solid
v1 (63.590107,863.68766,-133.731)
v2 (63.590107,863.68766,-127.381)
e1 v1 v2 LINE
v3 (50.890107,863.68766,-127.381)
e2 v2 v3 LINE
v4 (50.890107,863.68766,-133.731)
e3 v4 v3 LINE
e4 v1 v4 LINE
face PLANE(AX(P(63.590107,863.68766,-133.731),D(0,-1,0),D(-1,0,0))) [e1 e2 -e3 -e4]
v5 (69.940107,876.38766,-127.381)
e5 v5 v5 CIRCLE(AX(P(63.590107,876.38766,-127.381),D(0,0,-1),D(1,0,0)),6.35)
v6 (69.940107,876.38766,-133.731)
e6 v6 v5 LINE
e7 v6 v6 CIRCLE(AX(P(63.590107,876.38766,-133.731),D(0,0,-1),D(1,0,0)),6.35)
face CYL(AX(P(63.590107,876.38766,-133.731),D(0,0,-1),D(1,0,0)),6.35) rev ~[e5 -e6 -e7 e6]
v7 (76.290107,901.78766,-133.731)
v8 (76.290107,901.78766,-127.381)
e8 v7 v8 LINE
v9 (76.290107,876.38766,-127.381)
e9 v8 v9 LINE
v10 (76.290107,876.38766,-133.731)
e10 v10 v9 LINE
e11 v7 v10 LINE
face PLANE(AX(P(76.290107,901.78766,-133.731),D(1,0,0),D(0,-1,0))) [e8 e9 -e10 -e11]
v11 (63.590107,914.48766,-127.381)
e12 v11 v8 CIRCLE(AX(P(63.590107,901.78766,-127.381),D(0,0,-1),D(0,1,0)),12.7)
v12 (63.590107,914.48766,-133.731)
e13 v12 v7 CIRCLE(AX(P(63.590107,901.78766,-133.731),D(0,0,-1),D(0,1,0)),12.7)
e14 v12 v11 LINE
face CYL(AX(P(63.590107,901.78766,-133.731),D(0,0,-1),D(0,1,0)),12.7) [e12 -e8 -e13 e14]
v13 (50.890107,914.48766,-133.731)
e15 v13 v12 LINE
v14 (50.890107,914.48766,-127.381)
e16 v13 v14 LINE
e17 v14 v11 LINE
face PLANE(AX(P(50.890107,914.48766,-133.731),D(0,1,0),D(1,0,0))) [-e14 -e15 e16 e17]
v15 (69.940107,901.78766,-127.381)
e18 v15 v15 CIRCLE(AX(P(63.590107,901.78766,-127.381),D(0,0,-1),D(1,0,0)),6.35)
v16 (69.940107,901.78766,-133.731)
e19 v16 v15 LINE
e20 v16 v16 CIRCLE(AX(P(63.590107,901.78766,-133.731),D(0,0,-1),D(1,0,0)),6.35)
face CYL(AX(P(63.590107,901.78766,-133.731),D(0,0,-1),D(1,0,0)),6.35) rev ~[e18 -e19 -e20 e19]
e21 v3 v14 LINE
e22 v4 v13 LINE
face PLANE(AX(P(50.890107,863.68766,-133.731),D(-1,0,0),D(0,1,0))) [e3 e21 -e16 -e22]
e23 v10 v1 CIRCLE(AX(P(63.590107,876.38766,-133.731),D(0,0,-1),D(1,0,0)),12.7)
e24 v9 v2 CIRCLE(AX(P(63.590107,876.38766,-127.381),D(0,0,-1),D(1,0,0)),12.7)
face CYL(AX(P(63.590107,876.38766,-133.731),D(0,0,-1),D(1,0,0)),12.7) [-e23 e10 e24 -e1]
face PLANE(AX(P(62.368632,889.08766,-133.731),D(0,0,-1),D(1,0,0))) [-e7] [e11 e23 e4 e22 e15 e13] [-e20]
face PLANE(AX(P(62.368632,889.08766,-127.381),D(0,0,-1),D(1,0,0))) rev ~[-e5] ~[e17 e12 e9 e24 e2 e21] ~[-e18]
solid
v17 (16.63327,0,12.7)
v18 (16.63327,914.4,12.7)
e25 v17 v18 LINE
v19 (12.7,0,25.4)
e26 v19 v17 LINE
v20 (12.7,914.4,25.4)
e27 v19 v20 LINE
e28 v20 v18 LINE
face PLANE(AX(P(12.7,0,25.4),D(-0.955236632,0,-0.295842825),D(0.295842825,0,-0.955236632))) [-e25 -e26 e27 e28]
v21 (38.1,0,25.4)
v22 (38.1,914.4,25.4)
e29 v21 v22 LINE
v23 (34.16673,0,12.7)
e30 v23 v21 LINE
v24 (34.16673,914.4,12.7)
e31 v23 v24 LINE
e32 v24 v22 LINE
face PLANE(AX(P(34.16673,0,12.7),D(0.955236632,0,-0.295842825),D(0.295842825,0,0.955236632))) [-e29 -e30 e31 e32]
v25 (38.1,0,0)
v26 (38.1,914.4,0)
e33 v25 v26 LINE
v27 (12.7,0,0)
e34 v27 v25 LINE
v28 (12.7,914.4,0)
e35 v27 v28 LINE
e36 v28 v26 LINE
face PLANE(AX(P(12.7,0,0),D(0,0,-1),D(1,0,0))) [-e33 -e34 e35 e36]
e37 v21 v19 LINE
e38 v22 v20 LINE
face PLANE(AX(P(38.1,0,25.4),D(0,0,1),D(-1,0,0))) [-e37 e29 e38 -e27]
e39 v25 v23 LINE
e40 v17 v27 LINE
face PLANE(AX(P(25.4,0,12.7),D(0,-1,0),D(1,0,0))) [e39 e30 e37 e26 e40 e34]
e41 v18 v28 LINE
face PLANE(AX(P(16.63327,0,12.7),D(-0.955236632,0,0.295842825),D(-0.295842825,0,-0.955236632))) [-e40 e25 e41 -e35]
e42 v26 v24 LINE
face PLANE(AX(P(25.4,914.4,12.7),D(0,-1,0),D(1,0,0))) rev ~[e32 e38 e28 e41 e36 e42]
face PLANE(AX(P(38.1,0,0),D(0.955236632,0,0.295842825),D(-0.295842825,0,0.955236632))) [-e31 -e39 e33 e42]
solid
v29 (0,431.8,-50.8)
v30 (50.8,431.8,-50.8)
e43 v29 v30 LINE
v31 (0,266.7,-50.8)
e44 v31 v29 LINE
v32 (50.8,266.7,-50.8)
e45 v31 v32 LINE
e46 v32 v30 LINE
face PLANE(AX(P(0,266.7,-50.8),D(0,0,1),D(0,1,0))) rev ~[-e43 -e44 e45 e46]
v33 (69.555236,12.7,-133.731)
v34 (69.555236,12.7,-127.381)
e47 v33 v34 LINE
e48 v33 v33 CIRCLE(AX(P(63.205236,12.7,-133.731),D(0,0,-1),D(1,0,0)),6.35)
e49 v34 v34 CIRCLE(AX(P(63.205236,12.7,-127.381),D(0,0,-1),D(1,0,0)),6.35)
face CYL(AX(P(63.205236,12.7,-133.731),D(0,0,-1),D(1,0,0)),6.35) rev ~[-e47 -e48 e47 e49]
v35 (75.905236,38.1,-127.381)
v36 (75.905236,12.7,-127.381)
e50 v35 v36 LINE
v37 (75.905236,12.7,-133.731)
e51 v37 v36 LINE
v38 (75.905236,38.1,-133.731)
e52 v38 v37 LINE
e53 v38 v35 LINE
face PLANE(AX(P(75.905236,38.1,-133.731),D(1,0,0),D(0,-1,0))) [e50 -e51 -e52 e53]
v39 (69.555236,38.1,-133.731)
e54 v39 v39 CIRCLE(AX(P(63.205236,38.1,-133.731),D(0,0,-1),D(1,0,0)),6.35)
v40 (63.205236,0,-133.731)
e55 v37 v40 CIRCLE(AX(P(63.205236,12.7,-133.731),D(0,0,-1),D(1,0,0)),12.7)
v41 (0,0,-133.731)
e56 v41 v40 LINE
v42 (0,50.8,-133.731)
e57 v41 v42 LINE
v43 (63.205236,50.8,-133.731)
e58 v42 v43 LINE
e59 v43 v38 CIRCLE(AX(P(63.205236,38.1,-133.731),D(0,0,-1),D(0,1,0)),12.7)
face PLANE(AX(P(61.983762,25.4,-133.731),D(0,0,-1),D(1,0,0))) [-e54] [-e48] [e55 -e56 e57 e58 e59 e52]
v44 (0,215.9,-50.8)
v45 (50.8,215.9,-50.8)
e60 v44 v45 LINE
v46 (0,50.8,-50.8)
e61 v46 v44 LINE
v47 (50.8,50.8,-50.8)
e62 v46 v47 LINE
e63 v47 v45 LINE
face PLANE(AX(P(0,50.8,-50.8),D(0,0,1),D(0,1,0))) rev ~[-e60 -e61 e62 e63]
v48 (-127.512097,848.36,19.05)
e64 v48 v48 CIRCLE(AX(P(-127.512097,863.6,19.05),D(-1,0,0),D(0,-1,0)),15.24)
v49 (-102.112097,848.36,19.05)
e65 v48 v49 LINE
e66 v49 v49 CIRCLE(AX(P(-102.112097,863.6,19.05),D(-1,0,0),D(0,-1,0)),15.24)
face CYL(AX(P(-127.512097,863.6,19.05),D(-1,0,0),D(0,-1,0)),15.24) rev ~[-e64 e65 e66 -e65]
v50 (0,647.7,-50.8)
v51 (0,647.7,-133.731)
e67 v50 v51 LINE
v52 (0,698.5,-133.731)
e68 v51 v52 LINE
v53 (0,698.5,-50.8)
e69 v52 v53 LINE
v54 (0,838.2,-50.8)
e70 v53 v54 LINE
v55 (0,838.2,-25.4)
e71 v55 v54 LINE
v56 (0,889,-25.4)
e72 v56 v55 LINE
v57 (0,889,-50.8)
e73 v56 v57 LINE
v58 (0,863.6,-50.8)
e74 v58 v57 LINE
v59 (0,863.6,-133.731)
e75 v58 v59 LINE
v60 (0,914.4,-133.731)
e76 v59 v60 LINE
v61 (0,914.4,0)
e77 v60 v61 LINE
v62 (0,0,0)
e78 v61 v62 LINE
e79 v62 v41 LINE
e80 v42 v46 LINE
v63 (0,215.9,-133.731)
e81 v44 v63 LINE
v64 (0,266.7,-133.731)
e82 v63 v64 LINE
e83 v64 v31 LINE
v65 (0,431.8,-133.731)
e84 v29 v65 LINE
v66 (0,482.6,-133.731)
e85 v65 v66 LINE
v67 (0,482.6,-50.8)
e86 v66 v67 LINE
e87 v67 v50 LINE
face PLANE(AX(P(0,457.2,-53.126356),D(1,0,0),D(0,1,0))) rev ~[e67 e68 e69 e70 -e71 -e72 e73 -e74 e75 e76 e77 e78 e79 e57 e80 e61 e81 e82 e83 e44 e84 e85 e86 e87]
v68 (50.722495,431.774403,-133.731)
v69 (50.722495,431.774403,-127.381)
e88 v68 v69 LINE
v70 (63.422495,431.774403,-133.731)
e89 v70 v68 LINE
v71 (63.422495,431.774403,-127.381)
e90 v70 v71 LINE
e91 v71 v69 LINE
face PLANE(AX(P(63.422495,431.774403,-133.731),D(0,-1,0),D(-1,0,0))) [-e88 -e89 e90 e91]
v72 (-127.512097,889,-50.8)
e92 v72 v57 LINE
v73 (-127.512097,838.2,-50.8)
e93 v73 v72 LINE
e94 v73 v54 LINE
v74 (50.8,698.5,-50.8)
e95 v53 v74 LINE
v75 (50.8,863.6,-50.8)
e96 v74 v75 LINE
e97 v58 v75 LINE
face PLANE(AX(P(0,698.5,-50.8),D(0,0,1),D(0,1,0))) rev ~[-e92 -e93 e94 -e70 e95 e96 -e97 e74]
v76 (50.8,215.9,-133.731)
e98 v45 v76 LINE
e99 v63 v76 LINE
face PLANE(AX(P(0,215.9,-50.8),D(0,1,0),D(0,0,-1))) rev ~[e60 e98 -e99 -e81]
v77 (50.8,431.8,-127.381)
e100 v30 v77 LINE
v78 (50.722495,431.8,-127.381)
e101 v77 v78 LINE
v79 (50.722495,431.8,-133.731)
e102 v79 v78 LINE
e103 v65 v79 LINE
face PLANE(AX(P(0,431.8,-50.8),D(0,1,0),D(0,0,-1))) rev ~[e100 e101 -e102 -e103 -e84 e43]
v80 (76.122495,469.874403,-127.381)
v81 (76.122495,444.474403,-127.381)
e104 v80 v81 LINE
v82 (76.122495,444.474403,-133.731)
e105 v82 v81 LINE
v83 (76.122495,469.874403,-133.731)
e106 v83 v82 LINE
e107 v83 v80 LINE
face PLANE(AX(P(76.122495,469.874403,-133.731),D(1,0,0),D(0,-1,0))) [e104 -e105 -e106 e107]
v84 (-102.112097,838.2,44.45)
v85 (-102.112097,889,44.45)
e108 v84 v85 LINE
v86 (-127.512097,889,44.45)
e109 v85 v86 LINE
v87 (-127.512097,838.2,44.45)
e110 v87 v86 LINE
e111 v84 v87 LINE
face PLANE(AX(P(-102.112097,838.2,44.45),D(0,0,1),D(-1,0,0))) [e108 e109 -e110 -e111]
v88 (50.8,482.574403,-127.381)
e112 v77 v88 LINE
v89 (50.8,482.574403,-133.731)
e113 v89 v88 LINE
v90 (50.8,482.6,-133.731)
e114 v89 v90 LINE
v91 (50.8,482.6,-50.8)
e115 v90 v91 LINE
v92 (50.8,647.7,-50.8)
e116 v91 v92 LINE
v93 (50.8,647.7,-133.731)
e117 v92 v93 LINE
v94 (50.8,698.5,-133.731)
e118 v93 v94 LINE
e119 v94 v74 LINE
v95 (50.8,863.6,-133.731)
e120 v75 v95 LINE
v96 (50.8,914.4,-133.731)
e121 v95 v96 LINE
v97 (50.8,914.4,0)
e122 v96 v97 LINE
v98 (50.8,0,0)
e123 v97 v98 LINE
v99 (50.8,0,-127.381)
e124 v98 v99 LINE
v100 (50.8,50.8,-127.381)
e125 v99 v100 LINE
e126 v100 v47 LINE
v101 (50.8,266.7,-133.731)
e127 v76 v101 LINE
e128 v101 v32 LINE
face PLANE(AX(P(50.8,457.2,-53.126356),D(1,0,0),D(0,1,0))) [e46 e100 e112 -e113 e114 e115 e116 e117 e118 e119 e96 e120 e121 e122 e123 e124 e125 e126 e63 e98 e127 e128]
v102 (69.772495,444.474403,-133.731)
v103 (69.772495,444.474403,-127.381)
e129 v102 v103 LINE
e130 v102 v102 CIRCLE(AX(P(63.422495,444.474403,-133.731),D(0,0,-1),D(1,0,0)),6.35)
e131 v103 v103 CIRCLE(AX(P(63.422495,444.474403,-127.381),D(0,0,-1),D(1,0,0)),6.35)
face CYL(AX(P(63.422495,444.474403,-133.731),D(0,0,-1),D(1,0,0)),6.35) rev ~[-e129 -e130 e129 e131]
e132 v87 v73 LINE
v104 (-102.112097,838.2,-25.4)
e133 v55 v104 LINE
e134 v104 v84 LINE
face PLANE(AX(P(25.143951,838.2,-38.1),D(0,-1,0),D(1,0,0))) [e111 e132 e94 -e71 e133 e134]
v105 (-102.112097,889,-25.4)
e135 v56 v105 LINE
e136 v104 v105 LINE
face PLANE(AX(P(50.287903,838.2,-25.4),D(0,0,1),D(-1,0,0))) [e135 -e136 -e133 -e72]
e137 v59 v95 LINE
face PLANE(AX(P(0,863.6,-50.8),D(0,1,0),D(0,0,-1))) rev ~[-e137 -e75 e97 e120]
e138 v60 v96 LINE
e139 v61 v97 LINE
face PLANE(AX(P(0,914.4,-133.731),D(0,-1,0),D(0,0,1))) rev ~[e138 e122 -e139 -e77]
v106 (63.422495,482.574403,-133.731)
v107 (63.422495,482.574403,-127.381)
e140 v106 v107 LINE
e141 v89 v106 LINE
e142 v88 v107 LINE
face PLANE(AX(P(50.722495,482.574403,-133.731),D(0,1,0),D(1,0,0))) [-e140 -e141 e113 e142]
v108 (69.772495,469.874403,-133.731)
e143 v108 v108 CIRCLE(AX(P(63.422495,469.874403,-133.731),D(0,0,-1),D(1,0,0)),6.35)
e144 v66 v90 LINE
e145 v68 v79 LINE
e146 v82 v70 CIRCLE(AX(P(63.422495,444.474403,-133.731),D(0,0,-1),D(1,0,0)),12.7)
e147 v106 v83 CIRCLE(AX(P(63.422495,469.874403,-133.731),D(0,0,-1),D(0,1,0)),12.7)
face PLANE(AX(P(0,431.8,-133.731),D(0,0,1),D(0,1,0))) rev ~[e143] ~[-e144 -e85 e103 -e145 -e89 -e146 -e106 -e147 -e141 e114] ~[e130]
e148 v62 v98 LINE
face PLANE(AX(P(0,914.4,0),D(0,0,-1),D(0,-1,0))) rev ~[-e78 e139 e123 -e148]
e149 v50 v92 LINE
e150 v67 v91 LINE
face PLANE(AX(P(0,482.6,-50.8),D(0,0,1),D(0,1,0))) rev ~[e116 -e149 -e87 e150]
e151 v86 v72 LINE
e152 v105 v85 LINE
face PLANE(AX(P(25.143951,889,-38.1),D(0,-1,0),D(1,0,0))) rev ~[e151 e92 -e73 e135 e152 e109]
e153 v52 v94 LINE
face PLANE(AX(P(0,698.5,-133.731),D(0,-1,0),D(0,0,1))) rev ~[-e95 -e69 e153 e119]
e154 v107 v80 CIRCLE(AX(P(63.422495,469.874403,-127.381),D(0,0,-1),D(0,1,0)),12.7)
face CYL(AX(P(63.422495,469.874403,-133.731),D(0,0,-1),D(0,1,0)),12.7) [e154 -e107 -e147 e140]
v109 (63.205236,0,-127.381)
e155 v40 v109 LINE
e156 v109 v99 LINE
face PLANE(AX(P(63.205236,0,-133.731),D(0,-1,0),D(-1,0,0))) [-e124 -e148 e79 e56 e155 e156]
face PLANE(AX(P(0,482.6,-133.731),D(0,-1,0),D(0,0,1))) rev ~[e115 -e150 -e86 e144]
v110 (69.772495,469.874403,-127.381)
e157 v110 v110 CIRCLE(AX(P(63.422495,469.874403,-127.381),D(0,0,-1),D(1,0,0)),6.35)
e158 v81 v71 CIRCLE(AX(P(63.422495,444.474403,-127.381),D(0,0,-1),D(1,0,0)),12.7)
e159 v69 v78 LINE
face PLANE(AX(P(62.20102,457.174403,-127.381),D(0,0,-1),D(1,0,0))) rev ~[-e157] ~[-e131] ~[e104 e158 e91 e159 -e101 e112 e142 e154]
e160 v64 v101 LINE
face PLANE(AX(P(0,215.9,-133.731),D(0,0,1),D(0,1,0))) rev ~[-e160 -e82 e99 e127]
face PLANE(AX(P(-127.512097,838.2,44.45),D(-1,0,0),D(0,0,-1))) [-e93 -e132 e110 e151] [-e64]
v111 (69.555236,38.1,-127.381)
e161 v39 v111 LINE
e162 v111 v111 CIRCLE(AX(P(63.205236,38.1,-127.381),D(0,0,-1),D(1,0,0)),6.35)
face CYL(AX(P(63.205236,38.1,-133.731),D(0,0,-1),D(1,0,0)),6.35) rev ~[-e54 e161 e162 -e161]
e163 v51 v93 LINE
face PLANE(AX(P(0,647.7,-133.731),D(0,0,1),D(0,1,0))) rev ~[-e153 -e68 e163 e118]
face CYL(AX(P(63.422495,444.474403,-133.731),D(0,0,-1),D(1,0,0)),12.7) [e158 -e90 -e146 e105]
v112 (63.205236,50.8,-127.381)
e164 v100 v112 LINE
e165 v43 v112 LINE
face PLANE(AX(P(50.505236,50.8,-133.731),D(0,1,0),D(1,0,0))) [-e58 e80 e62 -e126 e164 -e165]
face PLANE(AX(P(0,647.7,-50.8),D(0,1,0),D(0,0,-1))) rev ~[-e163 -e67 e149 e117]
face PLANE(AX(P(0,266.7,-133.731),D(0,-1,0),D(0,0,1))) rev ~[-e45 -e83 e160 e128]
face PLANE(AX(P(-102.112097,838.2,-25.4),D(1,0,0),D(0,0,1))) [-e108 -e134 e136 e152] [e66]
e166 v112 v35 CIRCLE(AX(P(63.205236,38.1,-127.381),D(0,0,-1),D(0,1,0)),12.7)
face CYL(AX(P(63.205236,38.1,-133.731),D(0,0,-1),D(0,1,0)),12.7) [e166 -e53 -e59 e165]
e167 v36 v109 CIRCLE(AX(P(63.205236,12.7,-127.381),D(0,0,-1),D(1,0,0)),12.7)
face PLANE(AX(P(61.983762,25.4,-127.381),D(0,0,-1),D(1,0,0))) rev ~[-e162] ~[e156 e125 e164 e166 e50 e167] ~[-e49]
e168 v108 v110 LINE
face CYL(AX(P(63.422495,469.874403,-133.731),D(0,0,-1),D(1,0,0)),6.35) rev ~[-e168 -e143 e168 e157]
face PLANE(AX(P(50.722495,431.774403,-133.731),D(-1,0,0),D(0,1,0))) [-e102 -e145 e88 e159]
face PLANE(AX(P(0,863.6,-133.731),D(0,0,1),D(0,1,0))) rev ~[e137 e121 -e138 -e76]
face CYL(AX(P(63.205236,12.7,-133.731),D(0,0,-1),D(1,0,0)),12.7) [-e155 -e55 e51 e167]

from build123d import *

# Parameters (mm, degrees)
F1_DEPTH  = 50.8
F3_DEPTH  = 914.4
F5_W      = 50.2879026413
F5_H      = 25.4
F6_DEPTH  = 50.8
F8_R      = 6.35
F9_DEPTH  = 6.35
F11_R     = 15.24
F12_DEPTH = 25.4


with BuildPart() as f1:
    # F0 (on Right) → F1 (new body)
    with BuildSketch(Plane.YZ):
        Polygon((914.4, 0), (0, 0), (0, -133.731), (50.8, -133.731), (50.8, -50.8), (215.9, -50.8), (215.9, -133.731), (266.7, -133.731), (266.7, -50.8), (431.8, -50.8), (431.8, -133.731), (482.6, -133.731), (482.6, -50.8), (647.7, -50.8), (647.7, -133.731), (698.5, -133.731), (698.5, -50.8), (863.6, -50.8), (863.6, -133.731), (914.4, -133.731), align=None)
    extrude(amount=F1_DEPTH)

    # F5 (on offset) → F6 (join)
    with BuildSketch(Plane.XZ.offset(-838.2)):
        with Locations((25.1439513206, -38.1)):
            Rectangle(F5_W, F5_H)
        Polygon((0, -50.8), (0, -25.4), (-102.1120973587, -25.4), (-102.1120973587, 44.45), (-127.5120973587, 44.45), (-127.5120973587, -50.8), align=None)
    extrude(amount=-F6_DEPTH)

    # F8 (on offset) → F9 (join)
    with BuildSketch(Plane(origin=(0, 0, -133.731), x_dir=(1, 0, 0), z_dir=(0, 0, -1))):
        with BuildLine():
            Line((63.2052357912, 0), (50.5052357912, 0))
            Line((50.5052357912, 0), (50.5052357912, -50.8))
            Line((50.5052357912, -50.8), (63.2052357912, -50.8))
            ThreePointArc((63.2052357912, -50.8), (72.1854919123, -47.0802561211), (75.9052357912, -38.1))
            Line((75.9052357912, -38.1), (75.9052357912, -12.7))
            ThreePointArc((75.9052357912, -12.7), (72.1854919123, -3.7197438789), (63.2052357912, 0))
        make_face()
        with Locations((63.2052357912, -38.1)):
            Circle(F8_R, mode=Mode.SUBTRACT)
        with Locations((63.2052357912, -12.7)):
            Circle(F8_R, mode=Mode.SUBTRACT)
        with BuildLine():
            Line((63.4224947214, -431.774403286), (50.7224947214, -431.774403286))
            Line((50.7224947214, -431.774403286), (50.7224947214, -482.574403286))
            Line((50.7224947214, -482.574403286), (63.4224947214, -482.574403286))
            ThreePointArc((63.4224947214, -482.574403286), (72.4027508425, -478.854659407), (76.1224947214, -469.874403286))
            Line((76.1224947214, -469.874403286), (76.1224947214, -444.474403286))
            ThreePointArc((76.1224947214, -444.474403286), (72.4027508425, -435.4941471649), (63.4224947214, -431.774403286))
        make_face()
        with Locations((63.4224947214, -469.874403286)):
            Circle(F8_R, mode=Mode.SUBTRACT)
        with Locations((63.4224947214, -444.474403286)):
            Circle(F8_R, mode=Mode.SUBTRACT)
    extrude(amount=-F9_DEPTH)

    # F11 (on face) → F12 (cut)
    with BuildSketch(Plane(origin=(-127.5120973587, 0, 0), x_dir=(0, -1, 0), z_dir=(-1, 0, 0))):
        with Locations((-863.6, 19.05)):
            Circle(F11_R)
    extrude(amount=-F12_DEPTH, mode=Mode.SUBTRACT)


with BuildPart() as f3:
    # F2 (on Front) → F3 (new body)
    with BuildSketch(Plane.XZ):
        Polygon((16.6332703084, 12.7), (12.7, 0), (38.1, 0), (34.1667296916, 12.7), (38.1, 25.4), (12.7, 25.4), align=None)
    extrude(amount=-F3_DEPTH)


with BuildPart() as f9:
    # F8 (on offset) → F9, piece 2 (new body)
    with BuildSketch(Plane(origin=(0, 0, -133.731), x_dir=(1, 0, 0), z_dir=(0, 0, -1))):
        with BuildLine():
            Line((50.8901067078, -863.6876599312), (50.8901067078, -914.4876599312))
            Line((50.8901067078, -914.4876599312), (63.5901067078, -914.4876599312))
            ThreePointArc((63.5901067078, -914.4876599312), (72.5703628289, -910.7679160523), (76.2901067078, -901.7876599312))
            Line((76.2901067078, -901.7876599312), (76.2901067078, -876.3876599312))
            ThreePointArc((76.2901067078, -876.3876599312), (72.5703628289, -867.4074038101), (63.5901067078, -863.6876599312))
            Line((63.5901067078, -863.6876599312), (50.8901067078, -863.6876599312))
        make_face()
        with Locations((63.5901067078, -901.7876599312)):
            Circle(F8_R, mode=Mode.SUBTRACT)
        with Locations((63.5901067078, -876.3876599312)):
            Circle(F8_R, mode=Mode.SUBTRACT)
    extrude(amount=-F9_DEPTH)


solid = Compound([f1.part, f3.part, f9.part])
